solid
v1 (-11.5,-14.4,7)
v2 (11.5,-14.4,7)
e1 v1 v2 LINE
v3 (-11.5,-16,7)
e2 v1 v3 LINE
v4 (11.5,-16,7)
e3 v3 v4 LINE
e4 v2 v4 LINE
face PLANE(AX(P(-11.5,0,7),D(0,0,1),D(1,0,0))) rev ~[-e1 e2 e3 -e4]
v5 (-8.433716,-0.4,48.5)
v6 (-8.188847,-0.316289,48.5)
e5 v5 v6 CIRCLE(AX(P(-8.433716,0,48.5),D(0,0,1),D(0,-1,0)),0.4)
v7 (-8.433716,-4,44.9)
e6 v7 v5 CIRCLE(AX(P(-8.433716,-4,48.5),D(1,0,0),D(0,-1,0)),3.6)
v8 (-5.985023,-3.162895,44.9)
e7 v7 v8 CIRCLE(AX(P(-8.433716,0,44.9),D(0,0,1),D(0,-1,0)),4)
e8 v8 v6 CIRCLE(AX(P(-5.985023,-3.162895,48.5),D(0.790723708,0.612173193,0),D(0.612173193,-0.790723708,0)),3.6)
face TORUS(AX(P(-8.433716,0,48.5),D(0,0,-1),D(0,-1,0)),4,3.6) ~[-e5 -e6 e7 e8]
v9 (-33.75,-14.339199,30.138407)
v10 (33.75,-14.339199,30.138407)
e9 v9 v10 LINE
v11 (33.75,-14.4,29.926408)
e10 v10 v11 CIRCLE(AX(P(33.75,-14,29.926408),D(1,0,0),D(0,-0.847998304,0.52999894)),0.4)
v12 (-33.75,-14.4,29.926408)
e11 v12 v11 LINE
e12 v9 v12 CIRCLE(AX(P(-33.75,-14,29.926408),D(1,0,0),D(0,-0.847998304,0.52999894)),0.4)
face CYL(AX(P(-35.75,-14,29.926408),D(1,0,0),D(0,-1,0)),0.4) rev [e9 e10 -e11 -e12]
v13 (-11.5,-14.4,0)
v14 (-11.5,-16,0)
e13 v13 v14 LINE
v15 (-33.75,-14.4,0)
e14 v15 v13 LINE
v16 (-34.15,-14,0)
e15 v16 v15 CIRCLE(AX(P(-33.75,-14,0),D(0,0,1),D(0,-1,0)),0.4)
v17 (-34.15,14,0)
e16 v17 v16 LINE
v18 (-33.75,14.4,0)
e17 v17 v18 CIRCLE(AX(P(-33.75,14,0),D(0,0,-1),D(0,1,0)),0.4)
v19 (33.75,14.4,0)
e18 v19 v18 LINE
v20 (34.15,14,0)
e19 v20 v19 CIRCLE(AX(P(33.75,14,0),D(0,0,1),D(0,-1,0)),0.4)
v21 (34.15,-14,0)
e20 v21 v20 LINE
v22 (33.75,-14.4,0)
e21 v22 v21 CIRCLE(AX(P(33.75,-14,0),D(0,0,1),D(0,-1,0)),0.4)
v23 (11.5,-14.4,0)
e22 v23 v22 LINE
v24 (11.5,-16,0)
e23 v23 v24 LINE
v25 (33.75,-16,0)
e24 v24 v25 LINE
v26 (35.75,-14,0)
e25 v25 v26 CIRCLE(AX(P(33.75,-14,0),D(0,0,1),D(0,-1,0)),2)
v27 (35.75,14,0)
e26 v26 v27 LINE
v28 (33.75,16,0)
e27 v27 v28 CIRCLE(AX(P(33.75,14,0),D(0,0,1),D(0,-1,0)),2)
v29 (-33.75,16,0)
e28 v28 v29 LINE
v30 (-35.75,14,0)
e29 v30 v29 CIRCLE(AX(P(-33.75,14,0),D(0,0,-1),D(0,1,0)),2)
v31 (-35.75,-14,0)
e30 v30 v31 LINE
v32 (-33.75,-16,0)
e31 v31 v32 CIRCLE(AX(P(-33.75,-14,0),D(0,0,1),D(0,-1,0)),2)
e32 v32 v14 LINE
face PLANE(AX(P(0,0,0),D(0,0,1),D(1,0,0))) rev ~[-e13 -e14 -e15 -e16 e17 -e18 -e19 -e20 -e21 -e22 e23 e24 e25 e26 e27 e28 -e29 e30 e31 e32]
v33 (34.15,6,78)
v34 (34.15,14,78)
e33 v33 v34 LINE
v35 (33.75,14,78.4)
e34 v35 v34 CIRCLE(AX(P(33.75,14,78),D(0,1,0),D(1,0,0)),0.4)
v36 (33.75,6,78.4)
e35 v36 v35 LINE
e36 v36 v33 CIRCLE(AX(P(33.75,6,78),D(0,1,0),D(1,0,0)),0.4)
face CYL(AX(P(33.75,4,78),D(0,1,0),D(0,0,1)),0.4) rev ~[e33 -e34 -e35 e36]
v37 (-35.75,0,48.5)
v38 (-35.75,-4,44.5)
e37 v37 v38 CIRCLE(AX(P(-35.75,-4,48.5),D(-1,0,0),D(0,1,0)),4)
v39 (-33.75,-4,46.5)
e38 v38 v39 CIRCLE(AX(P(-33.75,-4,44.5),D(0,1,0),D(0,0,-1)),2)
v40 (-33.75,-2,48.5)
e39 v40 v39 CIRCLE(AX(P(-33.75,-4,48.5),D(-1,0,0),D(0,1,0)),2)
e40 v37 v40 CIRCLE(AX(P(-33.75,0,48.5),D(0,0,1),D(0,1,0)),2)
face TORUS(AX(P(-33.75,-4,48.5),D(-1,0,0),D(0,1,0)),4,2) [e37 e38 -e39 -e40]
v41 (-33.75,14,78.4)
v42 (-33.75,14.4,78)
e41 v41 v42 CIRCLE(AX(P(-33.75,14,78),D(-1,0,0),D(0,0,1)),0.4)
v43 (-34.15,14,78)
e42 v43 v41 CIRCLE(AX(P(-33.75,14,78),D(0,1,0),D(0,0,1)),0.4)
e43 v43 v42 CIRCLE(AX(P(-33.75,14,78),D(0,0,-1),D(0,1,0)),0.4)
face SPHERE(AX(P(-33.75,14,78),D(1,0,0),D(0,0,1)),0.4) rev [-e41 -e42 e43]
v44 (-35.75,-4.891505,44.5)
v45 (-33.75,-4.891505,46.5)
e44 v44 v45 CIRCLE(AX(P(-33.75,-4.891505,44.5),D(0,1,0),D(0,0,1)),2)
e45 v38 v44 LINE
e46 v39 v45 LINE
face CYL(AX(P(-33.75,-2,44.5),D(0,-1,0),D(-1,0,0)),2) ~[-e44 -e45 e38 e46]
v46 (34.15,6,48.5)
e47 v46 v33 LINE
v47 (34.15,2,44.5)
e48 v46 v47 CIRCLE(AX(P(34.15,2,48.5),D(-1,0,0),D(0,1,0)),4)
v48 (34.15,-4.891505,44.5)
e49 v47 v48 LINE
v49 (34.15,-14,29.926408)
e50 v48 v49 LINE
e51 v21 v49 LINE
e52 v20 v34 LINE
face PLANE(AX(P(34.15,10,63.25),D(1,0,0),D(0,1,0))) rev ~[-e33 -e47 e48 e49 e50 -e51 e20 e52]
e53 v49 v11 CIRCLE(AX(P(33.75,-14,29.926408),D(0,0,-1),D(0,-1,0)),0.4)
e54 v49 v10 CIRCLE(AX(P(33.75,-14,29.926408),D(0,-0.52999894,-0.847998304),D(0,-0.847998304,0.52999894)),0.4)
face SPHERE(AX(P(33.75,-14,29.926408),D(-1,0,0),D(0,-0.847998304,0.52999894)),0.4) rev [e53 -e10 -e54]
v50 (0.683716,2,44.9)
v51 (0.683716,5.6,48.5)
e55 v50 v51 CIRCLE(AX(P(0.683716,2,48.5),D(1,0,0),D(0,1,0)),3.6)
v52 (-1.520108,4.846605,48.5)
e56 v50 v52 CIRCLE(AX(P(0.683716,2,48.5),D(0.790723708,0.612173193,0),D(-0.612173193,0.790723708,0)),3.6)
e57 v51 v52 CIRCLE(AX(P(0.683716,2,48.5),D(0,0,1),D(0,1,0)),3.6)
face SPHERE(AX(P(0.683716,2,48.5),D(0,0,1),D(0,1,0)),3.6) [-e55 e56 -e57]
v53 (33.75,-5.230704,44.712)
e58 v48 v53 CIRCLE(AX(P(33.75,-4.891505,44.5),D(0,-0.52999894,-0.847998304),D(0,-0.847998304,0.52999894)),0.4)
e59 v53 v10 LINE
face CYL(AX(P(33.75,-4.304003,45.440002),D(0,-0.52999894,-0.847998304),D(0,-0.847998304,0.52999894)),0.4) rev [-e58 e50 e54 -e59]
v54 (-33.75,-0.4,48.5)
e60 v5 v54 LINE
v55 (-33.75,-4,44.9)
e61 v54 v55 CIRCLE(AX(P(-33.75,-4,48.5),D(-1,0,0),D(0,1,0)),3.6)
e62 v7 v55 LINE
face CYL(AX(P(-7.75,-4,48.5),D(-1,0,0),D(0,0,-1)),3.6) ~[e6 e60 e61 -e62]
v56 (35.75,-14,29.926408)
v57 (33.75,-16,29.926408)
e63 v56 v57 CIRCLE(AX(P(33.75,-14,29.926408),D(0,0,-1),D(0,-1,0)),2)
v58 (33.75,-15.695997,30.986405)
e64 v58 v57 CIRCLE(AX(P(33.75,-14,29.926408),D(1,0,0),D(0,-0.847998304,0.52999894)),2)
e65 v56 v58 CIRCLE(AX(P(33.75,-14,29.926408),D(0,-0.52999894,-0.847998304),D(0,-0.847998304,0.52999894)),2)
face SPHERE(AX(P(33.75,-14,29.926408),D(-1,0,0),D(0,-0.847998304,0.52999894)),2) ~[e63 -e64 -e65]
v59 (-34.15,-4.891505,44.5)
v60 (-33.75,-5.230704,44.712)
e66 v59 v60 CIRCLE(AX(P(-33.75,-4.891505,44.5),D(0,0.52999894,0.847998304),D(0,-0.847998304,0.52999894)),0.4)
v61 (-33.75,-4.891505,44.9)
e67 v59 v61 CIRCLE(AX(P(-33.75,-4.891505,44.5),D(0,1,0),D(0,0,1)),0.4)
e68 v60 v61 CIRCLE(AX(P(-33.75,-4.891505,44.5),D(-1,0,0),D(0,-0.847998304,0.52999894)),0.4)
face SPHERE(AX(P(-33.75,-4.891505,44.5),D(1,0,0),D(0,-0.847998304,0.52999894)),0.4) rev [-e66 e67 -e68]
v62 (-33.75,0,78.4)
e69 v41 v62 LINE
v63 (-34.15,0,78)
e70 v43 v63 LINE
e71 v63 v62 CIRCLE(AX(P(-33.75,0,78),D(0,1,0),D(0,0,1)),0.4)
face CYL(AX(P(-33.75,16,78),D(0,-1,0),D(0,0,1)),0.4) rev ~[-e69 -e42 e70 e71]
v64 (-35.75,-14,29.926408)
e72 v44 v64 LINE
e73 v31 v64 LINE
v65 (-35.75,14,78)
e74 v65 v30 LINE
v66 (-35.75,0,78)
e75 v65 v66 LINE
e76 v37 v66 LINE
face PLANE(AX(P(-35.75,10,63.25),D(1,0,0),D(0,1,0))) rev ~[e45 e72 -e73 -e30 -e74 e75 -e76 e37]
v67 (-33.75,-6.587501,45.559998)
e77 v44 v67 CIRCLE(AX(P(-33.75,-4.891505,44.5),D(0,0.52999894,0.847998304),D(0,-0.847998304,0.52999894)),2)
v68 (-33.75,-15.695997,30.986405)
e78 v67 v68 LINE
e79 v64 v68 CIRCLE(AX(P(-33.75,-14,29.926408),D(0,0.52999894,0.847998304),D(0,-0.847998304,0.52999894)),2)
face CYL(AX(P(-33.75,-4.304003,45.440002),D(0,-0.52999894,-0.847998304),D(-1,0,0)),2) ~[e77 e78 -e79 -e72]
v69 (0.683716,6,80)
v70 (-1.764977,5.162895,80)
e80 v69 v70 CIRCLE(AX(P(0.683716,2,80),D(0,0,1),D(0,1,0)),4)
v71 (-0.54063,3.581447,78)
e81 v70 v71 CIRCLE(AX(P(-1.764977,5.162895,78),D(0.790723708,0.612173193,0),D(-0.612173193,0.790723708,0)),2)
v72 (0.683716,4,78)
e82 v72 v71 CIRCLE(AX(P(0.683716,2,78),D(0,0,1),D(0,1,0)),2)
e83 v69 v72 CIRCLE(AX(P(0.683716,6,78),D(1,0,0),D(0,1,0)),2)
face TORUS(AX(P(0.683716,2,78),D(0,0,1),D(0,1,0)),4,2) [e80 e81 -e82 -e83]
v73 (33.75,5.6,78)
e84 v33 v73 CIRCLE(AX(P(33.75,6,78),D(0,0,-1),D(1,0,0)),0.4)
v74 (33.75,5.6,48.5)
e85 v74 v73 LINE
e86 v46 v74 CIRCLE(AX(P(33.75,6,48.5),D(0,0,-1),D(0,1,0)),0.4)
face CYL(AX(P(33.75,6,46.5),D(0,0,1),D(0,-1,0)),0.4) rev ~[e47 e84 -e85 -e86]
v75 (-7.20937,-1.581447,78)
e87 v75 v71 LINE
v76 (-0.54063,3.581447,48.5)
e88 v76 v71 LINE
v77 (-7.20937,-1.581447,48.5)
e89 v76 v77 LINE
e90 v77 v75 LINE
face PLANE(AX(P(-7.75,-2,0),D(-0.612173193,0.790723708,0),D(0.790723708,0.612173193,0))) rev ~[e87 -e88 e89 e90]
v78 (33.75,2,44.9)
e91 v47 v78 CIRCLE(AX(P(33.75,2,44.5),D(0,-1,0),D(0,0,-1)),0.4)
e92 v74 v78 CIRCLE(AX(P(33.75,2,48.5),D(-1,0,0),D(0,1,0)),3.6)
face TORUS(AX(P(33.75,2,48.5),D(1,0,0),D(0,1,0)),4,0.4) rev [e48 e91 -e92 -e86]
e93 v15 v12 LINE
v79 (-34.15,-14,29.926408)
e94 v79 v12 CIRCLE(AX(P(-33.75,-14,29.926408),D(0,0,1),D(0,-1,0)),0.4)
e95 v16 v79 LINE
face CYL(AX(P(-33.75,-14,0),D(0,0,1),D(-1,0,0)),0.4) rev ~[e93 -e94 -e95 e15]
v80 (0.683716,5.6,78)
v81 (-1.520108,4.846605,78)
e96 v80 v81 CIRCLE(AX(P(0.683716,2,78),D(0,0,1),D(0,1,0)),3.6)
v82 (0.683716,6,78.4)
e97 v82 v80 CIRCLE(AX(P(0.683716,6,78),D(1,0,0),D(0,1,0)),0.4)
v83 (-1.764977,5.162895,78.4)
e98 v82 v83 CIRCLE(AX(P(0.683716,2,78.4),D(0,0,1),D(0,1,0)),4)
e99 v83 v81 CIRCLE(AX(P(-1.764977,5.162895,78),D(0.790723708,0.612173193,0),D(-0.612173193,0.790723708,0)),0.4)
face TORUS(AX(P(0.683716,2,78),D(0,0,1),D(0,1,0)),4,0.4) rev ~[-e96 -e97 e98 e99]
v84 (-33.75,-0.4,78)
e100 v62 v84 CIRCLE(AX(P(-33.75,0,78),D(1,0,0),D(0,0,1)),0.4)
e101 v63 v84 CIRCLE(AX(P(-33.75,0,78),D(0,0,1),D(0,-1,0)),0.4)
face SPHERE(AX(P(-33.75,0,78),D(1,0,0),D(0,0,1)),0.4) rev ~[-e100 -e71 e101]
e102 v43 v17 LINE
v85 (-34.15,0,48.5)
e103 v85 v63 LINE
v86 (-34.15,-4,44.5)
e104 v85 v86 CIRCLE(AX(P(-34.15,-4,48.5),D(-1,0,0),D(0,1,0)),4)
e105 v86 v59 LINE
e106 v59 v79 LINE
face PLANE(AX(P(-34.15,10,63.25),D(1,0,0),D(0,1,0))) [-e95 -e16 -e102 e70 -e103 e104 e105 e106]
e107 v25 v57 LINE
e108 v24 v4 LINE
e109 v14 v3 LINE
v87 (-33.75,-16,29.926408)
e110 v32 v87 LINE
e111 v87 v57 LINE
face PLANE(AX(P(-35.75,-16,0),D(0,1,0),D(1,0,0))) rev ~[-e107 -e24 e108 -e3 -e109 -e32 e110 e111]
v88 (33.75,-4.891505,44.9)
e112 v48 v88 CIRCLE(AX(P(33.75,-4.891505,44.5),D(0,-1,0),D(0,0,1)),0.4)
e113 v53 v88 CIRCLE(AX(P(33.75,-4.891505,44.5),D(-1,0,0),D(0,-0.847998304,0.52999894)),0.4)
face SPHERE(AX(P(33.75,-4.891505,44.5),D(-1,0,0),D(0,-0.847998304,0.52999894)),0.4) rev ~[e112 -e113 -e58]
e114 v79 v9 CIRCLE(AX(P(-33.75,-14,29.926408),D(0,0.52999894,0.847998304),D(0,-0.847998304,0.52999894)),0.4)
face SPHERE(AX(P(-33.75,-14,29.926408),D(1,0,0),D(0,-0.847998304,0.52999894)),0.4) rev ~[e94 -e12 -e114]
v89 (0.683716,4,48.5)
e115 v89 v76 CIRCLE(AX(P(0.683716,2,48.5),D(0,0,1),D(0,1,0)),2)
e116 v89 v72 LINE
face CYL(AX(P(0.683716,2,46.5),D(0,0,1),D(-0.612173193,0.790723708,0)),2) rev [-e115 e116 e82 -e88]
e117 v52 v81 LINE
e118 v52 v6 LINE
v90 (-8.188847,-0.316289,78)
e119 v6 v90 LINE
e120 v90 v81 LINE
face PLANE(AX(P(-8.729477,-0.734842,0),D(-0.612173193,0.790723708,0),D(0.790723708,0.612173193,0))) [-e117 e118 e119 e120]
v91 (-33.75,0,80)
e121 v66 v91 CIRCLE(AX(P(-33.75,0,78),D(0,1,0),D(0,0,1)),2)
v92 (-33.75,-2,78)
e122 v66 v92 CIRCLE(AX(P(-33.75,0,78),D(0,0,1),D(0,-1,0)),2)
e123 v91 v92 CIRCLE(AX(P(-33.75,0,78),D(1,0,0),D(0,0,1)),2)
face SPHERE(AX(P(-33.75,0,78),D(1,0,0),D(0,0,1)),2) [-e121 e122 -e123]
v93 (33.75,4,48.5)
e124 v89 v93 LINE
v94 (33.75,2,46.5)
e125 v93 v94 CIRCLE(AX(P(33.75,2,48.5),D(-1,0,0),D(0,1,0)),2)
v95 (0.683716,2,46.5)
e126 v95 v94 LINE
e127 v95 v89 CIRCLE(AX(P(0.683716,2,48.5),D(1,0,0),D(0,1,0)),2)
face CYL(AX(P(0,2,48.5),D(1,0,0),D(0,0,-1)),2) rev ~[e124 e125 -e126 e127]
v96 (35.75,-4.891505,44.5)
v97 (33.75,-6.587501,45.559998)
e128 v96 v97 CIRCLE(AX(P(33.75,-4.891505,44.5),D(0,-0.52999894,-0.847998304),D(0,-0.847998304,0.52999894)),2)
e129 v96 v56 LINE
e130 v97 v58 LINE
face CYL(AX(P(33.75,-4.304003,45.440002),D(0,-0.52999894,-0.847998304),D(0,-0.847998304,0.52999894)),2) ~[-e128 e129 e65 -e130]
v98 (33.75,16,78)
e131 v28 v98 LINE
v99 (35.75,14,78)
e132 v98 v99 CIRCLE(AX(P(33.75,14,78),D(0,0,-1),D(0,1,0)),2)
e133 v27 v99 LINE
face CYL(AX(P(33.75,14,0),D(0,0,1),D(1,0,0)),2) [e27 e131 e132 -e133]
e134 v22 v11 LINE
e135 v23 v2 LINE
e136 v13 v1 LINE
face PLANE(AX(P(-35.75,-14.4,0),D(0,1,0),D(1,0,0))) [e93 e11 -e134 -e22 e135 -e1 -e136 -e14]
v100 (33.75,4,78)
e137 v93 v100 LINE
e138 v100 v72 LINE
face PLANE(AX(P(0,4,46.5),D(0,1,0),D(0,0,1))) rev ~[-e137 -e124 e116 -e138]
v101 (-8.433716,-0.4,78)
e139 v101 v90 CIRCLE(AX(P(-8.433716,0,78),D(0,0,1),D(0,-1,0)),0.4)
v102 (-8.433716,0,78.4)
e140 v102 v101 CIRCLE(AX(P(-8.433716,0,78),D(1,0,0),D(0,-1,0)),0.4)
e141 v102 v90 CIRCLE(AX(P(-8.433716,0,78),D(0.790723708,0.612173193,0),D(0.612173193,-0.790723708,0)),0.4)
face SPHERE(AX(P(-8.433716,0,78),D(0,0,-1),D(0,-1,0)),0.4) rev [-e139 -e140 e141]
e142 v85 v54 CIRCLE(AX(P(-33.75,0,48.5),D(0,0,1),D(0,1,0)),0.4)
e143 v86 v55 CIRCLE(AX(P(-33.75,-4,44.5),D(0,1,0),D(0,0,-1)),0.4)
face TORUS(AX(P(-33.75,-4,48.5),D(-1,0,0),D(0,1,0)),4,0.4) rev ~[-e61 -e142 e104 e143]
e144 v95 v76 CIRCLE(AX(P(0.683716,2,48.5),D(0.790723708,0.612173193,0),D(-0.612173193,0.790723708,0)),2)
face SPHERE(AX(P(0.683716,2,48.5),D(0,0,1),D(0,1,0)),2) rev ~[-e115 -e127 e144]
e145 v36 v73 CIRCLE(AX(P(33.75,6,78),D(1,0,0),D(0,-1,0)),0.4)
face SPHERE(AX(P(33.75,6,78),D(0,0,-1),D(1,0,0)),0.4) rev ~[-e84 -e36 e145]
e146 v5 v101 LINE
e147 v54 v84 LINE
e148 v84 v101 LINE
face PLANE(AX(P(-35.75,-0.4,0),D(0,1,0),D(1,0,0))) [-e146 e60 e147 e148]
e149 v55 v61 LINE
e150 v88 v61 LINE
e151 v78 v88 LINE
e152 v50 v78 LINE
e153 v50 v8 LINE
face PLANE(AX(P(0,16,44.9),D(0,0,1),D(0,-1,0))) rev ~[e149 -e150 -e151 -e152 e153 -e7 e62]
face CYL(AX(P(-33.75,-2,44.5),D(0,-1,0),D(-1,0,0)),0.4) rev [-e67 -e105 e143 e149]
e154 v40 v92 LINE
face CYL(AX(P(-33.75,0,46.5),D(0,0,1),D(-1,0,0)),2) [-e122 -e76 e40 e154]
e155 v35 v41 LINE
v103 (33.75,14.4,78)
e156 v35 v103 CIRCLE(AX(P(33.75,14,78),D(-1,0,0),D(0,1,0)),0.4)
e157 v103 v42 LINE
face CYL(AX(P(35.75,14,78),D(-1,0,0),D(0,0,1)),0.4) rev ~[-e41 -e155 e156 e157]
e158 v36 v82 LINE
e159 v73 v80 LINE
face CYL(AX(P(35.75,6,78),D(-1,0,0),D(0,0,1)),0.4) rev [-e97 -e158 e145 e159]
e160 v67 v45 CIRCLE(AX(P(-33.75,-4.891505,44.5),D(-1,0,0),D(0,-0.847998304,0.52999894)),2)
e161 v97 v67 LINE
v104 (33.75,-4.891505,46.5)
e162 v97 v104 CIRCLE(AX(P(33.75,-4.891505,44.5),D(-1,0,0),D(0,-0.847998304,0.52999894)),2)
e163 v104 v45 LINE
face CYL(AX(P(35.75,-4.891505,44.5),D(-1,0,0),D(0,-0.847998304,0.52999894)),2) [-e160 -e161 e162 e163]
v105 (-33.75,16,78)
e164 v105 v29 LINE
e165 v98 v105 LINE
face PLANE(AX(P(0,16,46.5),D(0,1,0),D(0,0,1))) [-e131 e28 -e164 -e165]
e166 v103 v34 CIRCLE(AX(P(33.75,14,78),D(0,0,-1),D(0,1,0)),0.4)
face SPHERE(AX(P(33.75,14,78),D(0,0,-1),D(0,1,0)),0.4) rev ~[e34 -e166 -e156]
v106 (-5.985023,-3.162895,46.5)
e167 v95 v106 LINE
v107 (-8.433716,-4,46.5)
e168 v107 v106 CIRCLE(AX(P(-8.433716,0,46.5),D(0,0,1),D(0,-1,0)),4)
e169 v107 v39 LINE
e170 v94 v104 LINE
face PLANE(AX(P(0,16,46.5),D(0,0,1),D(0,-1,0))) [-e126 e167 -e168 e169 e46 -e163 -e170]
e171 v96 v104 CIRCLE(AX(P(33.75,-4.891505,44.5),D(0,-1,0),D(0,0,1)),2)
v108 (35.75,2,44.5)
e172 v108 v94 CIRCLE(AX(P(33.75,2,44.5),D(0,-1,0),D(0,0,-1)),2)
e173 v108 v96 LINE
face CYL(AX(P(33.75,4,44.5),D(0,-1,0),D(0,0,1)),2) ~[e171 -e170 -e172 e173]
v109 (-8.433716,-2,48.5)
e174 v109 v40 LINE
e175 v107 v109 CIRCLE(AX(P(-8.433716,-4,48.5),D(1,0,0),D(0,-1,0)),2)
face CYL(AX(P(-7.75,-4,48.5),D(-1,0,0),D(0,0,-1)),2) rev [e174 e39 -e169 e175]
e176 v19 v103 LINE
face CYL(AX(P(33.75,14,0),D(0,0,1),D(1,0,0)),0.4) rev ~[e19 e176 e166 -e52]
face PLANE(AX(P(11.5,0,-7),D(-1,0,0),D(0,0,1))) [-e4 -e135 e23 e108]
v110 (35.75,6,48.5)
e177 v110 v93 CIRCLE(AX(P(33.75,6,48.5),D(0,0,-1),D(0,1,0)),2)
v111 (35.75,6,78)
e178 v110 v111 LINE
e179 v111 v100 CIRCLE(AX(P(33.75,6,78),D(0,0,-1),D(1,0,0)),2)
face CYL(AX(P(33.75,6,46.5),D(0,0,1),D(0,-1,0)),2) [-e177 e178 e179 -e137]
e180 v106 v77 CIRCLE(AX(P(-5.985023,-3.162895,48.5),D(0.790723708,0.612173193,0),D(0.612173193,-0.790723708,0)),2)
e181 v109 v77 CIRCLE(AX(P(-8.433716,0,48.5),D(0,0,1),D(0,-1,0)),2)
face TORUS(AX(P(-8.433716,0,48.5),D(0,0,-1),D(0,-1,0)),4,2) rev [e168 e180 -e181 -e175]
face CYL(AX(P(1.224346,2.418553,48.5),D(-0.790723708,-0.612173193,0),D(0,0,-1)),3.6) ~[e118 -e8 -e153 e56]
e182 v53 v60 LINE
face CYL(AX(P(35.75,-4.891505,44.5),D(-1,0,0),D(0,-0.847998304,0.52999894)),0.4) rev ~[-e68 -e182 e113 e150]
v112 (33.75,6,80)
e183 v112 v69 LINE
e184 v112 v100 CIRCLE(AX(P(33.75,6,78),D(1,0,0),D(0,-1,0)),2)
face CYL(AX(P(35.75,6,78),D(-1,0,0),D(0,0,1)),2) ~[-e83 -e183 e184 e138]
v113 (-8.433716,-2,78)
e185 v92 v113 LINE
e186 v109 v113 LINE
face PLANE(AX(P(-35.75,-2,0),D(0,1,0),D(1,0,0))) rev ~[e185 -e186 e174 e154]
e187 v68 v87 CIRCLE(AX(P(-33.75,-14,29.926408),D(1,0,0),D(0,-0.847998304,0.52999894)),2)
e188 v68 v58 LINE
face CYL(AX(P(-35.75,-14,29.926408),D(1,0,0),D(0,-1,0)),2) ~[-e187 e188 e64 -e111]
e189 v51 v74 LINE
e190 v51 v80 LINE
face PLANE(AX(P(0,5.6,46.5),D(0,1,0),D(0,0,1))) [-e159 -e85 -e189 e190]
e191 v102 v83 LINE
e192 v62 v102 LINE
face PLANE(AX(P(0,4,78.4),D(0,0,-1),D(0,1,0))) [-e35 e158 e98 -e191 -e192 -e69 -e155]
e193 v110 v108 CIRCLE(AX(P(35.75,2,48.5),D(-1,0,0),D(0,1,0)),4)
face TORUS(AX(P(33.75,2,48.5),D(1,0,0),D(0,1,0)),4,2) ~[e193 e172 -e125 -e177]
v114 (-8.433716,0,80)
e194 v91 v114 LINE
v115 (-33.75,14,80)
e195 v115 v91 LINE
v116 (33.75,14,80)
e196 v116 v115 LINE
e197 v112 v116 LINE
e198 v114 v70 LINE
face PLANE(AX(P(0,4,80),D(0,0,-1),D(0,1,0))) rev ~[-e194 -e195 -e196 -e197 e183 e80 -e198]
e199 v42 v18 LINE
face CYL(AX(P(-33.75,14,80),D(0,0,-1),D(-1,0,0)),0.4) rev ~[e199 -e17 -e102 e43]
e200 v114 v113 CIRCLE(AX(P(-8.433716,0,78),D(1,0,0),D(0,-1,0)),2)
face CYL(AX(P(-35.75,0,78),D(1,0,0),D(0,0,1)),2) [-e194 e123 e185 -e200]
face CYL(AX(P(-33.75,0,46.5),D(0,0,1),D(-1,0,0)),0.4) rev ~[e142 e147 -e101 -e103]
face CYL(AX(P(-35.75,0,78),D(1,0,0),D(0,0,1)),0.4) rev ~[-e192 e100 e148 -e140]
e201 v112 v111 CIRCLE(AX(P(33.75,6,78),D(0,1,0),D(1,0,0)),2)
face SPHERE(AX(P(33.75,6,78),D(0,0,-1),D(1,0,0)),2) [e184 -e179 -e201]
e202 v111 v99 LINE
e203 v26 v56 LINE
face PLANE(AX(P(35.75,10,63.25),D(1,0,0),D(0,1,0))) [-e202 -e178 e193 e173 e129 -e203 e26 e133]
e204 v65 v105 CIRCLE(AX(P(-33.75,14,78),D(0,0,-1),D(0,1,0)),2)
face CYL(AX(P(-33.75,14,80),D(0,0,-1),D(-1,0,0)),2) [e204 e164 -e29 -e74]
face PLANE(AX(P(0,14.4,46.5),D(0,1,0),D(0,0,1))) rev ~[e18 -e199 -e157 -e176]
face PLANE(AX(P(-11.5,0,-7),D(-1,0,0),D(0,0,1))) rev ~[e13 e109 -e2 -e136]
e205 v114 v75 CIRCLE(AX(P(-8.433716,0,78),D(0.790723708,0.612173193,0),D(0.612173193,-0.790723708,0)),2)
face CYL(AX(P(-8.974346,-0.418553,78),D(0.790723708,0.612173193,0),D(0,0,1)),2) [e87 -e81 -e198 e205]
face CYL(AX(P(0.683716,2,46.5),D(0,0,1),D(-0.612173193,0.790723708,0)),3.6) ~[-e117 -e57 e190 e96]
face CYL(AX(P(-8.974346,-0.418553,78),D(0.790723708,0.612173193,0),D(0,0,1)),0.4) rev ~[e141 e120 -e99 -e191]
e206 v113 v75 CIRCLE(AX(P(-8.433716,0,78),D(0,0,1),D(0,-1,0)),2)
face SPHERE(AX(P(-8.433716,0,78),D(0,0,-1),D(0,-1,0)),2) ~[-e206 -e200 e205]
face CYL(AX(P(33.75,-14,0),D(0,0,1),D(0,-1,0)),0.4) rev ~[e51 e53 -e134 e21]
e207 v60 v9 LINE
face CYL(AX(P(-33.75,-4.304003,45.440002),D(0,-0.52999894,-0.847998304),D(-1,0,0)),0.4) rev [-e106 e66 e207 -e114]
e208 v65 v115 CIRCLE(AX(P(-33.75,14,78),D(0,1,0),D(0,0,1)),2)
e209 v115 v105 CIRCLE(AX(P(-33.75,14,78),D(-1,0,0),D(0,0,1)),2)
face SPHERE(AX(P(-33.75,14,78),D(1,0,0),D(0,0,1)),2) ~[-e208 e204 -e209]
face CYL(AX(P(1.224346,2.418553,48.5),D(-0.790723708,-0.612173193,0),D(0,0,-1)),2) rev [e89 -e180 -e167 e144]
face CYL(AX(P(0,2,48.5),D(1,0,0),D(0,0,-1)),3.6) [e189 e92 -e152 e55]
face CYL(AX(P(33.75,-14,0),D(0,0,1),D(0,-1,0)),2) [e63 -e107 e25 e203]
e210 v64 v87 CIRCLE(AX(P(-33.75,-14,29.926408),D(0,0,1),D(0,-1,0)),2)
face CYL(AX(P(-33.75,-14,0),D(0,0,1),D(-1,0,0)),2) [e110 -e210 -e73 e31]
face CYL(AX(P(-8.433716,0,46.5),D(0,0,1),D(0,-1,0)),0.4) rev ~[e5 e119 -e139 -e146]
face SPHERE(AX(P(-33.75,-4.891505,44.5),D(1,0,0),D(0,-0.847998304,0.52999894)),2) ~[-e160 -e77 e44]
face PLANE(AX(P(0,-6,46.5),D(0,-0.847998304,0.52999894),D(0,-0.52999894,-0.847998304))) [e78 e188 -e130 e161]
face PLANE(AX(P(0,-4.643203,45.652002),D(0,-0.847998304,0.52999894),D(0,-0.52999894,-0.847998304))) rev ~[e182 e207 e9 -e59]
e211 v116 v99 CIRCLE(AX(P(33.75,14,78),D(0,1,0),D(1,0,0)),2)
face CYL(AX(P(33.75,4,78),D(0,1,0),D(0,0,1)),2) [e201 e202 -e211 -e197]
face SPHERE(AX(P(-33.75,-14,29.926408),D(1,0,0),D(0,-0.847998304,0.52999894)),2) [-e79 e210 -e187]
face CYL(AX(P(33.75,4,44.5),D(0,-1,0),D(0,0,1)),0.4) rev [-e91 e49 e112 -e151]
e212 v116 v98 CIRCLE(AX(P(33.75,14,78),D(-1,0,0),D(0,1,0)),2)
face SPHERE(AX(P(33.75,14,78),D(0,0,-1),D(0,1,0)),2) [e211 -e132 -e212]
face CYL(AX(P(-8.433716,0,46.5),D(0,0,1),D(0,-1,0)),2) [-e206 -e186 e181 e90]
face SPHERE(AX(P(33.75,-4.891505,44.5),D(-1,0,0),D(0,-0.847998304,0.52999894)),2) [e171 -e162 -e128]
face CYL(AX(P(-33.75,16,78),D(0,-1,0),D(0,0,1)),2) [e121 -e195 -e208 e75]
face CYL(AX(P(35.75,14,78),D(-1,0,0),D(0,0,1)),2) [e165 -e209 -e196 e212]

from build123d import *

# Parameters (mm, degrees)
F0_W      = 71.5
F0_H      = 32
F1_DEPTH  = 30.5
F3_DEPTH  = 35.75
F4_W      = 12
F4_H      = 33.5
F5_DEPTH  = 35.75
F7_DEPTH  = 80
F8_R      = 2
F9_T      = -1.6
F10_W     = 23
F10_H     = 14
F11_DEPTH = 25


with BuildPart() as f1:
    # F0 (on Top) → F1 (new body)
    with BuildSketch(Plane.XY):
        Rectangle(F0_W, F0_H)
    extrude(amount=F1_DEPTH)

    # F2 (on Right) → F3 (join, symmetric)
    with BuildSketch(Plane.YZ):
        Polygon((-16, 30.5), (0, 30.5), (16, 30.5), (16, 46.5), (-6, 46.5), align=None)
    extrude(amount=F3_DEPTH, both=True)

    # F4 (on Right) → F5 (join, symmetric)
    with BuildSketch(Plane.YZ):
        with Locations((10, 63.25)):
            Rectangle(F4_W, F4_H)
    extrude(amount=F5_DEPTH, both=True)

    # F6 (on Top) → F7 (join)
    with BuildSketch(Plane.XY):
        Polygon((-7.75, -2), (0, 4), (0, 16), (-35.75, 16), (-35.75, -2), align=None)
    extrude(amount=F7_DEPTH)

    # F8
    f8_edges = [f1.edges().sort_by_distance(p)[0] for p in [
        (0, 4, 63.25),
        (-7.75, -2, 63.25),
        (17.875, 4, 46.5),
        (0, -6, 46.5),
        (0, -16, 30.5),
        (35.75, 4, 63.25),
        (35.75, 16, 40),
        (0, 16, 80),
        (35.75, 10, 80),
        (17.875, 4, 80),
        (-21.75, -2, 80),
        (-35.75, 7, 80),
        (-35.75, -2, 63.25),
        (-35.75, 16, 40),
        (-35.75, -11, 38.5),
        (-35.75, -16, 15.25),
        (-35.75, -4, 46.5),
        (35.75, -11, 38.5),
        (35.75, -16, 15.25),
        (-21.75, -2, 46.5),
        (35.75, -1, 46.5),
        (-3.875, 1, 46.5),
        (-3.875, 1, 80),
    ]]
    fillet(f8_edges, radius=F8_R)

    # F9
    f9_openings = [f1.faces().sort_by_distance(p)[0] for p in [
        (0, 0, 0),
    ]]
    offset(amount=F9_T, openings=f9_openings)


with BuildPart() as f11:
    # F10 (on Front) → F11 (new body)
    with BuildSketch(Plane.XZ):
        Rectangle(F10_W, F10_H)
    extrude(amount=F11_DEPTH)


with BuildPart() as f1_1:
    add(f1.part)

    # F12: cut F11
    add(f11.part, mode=Mode.SUBTRACT)


solid = f1_1.part
